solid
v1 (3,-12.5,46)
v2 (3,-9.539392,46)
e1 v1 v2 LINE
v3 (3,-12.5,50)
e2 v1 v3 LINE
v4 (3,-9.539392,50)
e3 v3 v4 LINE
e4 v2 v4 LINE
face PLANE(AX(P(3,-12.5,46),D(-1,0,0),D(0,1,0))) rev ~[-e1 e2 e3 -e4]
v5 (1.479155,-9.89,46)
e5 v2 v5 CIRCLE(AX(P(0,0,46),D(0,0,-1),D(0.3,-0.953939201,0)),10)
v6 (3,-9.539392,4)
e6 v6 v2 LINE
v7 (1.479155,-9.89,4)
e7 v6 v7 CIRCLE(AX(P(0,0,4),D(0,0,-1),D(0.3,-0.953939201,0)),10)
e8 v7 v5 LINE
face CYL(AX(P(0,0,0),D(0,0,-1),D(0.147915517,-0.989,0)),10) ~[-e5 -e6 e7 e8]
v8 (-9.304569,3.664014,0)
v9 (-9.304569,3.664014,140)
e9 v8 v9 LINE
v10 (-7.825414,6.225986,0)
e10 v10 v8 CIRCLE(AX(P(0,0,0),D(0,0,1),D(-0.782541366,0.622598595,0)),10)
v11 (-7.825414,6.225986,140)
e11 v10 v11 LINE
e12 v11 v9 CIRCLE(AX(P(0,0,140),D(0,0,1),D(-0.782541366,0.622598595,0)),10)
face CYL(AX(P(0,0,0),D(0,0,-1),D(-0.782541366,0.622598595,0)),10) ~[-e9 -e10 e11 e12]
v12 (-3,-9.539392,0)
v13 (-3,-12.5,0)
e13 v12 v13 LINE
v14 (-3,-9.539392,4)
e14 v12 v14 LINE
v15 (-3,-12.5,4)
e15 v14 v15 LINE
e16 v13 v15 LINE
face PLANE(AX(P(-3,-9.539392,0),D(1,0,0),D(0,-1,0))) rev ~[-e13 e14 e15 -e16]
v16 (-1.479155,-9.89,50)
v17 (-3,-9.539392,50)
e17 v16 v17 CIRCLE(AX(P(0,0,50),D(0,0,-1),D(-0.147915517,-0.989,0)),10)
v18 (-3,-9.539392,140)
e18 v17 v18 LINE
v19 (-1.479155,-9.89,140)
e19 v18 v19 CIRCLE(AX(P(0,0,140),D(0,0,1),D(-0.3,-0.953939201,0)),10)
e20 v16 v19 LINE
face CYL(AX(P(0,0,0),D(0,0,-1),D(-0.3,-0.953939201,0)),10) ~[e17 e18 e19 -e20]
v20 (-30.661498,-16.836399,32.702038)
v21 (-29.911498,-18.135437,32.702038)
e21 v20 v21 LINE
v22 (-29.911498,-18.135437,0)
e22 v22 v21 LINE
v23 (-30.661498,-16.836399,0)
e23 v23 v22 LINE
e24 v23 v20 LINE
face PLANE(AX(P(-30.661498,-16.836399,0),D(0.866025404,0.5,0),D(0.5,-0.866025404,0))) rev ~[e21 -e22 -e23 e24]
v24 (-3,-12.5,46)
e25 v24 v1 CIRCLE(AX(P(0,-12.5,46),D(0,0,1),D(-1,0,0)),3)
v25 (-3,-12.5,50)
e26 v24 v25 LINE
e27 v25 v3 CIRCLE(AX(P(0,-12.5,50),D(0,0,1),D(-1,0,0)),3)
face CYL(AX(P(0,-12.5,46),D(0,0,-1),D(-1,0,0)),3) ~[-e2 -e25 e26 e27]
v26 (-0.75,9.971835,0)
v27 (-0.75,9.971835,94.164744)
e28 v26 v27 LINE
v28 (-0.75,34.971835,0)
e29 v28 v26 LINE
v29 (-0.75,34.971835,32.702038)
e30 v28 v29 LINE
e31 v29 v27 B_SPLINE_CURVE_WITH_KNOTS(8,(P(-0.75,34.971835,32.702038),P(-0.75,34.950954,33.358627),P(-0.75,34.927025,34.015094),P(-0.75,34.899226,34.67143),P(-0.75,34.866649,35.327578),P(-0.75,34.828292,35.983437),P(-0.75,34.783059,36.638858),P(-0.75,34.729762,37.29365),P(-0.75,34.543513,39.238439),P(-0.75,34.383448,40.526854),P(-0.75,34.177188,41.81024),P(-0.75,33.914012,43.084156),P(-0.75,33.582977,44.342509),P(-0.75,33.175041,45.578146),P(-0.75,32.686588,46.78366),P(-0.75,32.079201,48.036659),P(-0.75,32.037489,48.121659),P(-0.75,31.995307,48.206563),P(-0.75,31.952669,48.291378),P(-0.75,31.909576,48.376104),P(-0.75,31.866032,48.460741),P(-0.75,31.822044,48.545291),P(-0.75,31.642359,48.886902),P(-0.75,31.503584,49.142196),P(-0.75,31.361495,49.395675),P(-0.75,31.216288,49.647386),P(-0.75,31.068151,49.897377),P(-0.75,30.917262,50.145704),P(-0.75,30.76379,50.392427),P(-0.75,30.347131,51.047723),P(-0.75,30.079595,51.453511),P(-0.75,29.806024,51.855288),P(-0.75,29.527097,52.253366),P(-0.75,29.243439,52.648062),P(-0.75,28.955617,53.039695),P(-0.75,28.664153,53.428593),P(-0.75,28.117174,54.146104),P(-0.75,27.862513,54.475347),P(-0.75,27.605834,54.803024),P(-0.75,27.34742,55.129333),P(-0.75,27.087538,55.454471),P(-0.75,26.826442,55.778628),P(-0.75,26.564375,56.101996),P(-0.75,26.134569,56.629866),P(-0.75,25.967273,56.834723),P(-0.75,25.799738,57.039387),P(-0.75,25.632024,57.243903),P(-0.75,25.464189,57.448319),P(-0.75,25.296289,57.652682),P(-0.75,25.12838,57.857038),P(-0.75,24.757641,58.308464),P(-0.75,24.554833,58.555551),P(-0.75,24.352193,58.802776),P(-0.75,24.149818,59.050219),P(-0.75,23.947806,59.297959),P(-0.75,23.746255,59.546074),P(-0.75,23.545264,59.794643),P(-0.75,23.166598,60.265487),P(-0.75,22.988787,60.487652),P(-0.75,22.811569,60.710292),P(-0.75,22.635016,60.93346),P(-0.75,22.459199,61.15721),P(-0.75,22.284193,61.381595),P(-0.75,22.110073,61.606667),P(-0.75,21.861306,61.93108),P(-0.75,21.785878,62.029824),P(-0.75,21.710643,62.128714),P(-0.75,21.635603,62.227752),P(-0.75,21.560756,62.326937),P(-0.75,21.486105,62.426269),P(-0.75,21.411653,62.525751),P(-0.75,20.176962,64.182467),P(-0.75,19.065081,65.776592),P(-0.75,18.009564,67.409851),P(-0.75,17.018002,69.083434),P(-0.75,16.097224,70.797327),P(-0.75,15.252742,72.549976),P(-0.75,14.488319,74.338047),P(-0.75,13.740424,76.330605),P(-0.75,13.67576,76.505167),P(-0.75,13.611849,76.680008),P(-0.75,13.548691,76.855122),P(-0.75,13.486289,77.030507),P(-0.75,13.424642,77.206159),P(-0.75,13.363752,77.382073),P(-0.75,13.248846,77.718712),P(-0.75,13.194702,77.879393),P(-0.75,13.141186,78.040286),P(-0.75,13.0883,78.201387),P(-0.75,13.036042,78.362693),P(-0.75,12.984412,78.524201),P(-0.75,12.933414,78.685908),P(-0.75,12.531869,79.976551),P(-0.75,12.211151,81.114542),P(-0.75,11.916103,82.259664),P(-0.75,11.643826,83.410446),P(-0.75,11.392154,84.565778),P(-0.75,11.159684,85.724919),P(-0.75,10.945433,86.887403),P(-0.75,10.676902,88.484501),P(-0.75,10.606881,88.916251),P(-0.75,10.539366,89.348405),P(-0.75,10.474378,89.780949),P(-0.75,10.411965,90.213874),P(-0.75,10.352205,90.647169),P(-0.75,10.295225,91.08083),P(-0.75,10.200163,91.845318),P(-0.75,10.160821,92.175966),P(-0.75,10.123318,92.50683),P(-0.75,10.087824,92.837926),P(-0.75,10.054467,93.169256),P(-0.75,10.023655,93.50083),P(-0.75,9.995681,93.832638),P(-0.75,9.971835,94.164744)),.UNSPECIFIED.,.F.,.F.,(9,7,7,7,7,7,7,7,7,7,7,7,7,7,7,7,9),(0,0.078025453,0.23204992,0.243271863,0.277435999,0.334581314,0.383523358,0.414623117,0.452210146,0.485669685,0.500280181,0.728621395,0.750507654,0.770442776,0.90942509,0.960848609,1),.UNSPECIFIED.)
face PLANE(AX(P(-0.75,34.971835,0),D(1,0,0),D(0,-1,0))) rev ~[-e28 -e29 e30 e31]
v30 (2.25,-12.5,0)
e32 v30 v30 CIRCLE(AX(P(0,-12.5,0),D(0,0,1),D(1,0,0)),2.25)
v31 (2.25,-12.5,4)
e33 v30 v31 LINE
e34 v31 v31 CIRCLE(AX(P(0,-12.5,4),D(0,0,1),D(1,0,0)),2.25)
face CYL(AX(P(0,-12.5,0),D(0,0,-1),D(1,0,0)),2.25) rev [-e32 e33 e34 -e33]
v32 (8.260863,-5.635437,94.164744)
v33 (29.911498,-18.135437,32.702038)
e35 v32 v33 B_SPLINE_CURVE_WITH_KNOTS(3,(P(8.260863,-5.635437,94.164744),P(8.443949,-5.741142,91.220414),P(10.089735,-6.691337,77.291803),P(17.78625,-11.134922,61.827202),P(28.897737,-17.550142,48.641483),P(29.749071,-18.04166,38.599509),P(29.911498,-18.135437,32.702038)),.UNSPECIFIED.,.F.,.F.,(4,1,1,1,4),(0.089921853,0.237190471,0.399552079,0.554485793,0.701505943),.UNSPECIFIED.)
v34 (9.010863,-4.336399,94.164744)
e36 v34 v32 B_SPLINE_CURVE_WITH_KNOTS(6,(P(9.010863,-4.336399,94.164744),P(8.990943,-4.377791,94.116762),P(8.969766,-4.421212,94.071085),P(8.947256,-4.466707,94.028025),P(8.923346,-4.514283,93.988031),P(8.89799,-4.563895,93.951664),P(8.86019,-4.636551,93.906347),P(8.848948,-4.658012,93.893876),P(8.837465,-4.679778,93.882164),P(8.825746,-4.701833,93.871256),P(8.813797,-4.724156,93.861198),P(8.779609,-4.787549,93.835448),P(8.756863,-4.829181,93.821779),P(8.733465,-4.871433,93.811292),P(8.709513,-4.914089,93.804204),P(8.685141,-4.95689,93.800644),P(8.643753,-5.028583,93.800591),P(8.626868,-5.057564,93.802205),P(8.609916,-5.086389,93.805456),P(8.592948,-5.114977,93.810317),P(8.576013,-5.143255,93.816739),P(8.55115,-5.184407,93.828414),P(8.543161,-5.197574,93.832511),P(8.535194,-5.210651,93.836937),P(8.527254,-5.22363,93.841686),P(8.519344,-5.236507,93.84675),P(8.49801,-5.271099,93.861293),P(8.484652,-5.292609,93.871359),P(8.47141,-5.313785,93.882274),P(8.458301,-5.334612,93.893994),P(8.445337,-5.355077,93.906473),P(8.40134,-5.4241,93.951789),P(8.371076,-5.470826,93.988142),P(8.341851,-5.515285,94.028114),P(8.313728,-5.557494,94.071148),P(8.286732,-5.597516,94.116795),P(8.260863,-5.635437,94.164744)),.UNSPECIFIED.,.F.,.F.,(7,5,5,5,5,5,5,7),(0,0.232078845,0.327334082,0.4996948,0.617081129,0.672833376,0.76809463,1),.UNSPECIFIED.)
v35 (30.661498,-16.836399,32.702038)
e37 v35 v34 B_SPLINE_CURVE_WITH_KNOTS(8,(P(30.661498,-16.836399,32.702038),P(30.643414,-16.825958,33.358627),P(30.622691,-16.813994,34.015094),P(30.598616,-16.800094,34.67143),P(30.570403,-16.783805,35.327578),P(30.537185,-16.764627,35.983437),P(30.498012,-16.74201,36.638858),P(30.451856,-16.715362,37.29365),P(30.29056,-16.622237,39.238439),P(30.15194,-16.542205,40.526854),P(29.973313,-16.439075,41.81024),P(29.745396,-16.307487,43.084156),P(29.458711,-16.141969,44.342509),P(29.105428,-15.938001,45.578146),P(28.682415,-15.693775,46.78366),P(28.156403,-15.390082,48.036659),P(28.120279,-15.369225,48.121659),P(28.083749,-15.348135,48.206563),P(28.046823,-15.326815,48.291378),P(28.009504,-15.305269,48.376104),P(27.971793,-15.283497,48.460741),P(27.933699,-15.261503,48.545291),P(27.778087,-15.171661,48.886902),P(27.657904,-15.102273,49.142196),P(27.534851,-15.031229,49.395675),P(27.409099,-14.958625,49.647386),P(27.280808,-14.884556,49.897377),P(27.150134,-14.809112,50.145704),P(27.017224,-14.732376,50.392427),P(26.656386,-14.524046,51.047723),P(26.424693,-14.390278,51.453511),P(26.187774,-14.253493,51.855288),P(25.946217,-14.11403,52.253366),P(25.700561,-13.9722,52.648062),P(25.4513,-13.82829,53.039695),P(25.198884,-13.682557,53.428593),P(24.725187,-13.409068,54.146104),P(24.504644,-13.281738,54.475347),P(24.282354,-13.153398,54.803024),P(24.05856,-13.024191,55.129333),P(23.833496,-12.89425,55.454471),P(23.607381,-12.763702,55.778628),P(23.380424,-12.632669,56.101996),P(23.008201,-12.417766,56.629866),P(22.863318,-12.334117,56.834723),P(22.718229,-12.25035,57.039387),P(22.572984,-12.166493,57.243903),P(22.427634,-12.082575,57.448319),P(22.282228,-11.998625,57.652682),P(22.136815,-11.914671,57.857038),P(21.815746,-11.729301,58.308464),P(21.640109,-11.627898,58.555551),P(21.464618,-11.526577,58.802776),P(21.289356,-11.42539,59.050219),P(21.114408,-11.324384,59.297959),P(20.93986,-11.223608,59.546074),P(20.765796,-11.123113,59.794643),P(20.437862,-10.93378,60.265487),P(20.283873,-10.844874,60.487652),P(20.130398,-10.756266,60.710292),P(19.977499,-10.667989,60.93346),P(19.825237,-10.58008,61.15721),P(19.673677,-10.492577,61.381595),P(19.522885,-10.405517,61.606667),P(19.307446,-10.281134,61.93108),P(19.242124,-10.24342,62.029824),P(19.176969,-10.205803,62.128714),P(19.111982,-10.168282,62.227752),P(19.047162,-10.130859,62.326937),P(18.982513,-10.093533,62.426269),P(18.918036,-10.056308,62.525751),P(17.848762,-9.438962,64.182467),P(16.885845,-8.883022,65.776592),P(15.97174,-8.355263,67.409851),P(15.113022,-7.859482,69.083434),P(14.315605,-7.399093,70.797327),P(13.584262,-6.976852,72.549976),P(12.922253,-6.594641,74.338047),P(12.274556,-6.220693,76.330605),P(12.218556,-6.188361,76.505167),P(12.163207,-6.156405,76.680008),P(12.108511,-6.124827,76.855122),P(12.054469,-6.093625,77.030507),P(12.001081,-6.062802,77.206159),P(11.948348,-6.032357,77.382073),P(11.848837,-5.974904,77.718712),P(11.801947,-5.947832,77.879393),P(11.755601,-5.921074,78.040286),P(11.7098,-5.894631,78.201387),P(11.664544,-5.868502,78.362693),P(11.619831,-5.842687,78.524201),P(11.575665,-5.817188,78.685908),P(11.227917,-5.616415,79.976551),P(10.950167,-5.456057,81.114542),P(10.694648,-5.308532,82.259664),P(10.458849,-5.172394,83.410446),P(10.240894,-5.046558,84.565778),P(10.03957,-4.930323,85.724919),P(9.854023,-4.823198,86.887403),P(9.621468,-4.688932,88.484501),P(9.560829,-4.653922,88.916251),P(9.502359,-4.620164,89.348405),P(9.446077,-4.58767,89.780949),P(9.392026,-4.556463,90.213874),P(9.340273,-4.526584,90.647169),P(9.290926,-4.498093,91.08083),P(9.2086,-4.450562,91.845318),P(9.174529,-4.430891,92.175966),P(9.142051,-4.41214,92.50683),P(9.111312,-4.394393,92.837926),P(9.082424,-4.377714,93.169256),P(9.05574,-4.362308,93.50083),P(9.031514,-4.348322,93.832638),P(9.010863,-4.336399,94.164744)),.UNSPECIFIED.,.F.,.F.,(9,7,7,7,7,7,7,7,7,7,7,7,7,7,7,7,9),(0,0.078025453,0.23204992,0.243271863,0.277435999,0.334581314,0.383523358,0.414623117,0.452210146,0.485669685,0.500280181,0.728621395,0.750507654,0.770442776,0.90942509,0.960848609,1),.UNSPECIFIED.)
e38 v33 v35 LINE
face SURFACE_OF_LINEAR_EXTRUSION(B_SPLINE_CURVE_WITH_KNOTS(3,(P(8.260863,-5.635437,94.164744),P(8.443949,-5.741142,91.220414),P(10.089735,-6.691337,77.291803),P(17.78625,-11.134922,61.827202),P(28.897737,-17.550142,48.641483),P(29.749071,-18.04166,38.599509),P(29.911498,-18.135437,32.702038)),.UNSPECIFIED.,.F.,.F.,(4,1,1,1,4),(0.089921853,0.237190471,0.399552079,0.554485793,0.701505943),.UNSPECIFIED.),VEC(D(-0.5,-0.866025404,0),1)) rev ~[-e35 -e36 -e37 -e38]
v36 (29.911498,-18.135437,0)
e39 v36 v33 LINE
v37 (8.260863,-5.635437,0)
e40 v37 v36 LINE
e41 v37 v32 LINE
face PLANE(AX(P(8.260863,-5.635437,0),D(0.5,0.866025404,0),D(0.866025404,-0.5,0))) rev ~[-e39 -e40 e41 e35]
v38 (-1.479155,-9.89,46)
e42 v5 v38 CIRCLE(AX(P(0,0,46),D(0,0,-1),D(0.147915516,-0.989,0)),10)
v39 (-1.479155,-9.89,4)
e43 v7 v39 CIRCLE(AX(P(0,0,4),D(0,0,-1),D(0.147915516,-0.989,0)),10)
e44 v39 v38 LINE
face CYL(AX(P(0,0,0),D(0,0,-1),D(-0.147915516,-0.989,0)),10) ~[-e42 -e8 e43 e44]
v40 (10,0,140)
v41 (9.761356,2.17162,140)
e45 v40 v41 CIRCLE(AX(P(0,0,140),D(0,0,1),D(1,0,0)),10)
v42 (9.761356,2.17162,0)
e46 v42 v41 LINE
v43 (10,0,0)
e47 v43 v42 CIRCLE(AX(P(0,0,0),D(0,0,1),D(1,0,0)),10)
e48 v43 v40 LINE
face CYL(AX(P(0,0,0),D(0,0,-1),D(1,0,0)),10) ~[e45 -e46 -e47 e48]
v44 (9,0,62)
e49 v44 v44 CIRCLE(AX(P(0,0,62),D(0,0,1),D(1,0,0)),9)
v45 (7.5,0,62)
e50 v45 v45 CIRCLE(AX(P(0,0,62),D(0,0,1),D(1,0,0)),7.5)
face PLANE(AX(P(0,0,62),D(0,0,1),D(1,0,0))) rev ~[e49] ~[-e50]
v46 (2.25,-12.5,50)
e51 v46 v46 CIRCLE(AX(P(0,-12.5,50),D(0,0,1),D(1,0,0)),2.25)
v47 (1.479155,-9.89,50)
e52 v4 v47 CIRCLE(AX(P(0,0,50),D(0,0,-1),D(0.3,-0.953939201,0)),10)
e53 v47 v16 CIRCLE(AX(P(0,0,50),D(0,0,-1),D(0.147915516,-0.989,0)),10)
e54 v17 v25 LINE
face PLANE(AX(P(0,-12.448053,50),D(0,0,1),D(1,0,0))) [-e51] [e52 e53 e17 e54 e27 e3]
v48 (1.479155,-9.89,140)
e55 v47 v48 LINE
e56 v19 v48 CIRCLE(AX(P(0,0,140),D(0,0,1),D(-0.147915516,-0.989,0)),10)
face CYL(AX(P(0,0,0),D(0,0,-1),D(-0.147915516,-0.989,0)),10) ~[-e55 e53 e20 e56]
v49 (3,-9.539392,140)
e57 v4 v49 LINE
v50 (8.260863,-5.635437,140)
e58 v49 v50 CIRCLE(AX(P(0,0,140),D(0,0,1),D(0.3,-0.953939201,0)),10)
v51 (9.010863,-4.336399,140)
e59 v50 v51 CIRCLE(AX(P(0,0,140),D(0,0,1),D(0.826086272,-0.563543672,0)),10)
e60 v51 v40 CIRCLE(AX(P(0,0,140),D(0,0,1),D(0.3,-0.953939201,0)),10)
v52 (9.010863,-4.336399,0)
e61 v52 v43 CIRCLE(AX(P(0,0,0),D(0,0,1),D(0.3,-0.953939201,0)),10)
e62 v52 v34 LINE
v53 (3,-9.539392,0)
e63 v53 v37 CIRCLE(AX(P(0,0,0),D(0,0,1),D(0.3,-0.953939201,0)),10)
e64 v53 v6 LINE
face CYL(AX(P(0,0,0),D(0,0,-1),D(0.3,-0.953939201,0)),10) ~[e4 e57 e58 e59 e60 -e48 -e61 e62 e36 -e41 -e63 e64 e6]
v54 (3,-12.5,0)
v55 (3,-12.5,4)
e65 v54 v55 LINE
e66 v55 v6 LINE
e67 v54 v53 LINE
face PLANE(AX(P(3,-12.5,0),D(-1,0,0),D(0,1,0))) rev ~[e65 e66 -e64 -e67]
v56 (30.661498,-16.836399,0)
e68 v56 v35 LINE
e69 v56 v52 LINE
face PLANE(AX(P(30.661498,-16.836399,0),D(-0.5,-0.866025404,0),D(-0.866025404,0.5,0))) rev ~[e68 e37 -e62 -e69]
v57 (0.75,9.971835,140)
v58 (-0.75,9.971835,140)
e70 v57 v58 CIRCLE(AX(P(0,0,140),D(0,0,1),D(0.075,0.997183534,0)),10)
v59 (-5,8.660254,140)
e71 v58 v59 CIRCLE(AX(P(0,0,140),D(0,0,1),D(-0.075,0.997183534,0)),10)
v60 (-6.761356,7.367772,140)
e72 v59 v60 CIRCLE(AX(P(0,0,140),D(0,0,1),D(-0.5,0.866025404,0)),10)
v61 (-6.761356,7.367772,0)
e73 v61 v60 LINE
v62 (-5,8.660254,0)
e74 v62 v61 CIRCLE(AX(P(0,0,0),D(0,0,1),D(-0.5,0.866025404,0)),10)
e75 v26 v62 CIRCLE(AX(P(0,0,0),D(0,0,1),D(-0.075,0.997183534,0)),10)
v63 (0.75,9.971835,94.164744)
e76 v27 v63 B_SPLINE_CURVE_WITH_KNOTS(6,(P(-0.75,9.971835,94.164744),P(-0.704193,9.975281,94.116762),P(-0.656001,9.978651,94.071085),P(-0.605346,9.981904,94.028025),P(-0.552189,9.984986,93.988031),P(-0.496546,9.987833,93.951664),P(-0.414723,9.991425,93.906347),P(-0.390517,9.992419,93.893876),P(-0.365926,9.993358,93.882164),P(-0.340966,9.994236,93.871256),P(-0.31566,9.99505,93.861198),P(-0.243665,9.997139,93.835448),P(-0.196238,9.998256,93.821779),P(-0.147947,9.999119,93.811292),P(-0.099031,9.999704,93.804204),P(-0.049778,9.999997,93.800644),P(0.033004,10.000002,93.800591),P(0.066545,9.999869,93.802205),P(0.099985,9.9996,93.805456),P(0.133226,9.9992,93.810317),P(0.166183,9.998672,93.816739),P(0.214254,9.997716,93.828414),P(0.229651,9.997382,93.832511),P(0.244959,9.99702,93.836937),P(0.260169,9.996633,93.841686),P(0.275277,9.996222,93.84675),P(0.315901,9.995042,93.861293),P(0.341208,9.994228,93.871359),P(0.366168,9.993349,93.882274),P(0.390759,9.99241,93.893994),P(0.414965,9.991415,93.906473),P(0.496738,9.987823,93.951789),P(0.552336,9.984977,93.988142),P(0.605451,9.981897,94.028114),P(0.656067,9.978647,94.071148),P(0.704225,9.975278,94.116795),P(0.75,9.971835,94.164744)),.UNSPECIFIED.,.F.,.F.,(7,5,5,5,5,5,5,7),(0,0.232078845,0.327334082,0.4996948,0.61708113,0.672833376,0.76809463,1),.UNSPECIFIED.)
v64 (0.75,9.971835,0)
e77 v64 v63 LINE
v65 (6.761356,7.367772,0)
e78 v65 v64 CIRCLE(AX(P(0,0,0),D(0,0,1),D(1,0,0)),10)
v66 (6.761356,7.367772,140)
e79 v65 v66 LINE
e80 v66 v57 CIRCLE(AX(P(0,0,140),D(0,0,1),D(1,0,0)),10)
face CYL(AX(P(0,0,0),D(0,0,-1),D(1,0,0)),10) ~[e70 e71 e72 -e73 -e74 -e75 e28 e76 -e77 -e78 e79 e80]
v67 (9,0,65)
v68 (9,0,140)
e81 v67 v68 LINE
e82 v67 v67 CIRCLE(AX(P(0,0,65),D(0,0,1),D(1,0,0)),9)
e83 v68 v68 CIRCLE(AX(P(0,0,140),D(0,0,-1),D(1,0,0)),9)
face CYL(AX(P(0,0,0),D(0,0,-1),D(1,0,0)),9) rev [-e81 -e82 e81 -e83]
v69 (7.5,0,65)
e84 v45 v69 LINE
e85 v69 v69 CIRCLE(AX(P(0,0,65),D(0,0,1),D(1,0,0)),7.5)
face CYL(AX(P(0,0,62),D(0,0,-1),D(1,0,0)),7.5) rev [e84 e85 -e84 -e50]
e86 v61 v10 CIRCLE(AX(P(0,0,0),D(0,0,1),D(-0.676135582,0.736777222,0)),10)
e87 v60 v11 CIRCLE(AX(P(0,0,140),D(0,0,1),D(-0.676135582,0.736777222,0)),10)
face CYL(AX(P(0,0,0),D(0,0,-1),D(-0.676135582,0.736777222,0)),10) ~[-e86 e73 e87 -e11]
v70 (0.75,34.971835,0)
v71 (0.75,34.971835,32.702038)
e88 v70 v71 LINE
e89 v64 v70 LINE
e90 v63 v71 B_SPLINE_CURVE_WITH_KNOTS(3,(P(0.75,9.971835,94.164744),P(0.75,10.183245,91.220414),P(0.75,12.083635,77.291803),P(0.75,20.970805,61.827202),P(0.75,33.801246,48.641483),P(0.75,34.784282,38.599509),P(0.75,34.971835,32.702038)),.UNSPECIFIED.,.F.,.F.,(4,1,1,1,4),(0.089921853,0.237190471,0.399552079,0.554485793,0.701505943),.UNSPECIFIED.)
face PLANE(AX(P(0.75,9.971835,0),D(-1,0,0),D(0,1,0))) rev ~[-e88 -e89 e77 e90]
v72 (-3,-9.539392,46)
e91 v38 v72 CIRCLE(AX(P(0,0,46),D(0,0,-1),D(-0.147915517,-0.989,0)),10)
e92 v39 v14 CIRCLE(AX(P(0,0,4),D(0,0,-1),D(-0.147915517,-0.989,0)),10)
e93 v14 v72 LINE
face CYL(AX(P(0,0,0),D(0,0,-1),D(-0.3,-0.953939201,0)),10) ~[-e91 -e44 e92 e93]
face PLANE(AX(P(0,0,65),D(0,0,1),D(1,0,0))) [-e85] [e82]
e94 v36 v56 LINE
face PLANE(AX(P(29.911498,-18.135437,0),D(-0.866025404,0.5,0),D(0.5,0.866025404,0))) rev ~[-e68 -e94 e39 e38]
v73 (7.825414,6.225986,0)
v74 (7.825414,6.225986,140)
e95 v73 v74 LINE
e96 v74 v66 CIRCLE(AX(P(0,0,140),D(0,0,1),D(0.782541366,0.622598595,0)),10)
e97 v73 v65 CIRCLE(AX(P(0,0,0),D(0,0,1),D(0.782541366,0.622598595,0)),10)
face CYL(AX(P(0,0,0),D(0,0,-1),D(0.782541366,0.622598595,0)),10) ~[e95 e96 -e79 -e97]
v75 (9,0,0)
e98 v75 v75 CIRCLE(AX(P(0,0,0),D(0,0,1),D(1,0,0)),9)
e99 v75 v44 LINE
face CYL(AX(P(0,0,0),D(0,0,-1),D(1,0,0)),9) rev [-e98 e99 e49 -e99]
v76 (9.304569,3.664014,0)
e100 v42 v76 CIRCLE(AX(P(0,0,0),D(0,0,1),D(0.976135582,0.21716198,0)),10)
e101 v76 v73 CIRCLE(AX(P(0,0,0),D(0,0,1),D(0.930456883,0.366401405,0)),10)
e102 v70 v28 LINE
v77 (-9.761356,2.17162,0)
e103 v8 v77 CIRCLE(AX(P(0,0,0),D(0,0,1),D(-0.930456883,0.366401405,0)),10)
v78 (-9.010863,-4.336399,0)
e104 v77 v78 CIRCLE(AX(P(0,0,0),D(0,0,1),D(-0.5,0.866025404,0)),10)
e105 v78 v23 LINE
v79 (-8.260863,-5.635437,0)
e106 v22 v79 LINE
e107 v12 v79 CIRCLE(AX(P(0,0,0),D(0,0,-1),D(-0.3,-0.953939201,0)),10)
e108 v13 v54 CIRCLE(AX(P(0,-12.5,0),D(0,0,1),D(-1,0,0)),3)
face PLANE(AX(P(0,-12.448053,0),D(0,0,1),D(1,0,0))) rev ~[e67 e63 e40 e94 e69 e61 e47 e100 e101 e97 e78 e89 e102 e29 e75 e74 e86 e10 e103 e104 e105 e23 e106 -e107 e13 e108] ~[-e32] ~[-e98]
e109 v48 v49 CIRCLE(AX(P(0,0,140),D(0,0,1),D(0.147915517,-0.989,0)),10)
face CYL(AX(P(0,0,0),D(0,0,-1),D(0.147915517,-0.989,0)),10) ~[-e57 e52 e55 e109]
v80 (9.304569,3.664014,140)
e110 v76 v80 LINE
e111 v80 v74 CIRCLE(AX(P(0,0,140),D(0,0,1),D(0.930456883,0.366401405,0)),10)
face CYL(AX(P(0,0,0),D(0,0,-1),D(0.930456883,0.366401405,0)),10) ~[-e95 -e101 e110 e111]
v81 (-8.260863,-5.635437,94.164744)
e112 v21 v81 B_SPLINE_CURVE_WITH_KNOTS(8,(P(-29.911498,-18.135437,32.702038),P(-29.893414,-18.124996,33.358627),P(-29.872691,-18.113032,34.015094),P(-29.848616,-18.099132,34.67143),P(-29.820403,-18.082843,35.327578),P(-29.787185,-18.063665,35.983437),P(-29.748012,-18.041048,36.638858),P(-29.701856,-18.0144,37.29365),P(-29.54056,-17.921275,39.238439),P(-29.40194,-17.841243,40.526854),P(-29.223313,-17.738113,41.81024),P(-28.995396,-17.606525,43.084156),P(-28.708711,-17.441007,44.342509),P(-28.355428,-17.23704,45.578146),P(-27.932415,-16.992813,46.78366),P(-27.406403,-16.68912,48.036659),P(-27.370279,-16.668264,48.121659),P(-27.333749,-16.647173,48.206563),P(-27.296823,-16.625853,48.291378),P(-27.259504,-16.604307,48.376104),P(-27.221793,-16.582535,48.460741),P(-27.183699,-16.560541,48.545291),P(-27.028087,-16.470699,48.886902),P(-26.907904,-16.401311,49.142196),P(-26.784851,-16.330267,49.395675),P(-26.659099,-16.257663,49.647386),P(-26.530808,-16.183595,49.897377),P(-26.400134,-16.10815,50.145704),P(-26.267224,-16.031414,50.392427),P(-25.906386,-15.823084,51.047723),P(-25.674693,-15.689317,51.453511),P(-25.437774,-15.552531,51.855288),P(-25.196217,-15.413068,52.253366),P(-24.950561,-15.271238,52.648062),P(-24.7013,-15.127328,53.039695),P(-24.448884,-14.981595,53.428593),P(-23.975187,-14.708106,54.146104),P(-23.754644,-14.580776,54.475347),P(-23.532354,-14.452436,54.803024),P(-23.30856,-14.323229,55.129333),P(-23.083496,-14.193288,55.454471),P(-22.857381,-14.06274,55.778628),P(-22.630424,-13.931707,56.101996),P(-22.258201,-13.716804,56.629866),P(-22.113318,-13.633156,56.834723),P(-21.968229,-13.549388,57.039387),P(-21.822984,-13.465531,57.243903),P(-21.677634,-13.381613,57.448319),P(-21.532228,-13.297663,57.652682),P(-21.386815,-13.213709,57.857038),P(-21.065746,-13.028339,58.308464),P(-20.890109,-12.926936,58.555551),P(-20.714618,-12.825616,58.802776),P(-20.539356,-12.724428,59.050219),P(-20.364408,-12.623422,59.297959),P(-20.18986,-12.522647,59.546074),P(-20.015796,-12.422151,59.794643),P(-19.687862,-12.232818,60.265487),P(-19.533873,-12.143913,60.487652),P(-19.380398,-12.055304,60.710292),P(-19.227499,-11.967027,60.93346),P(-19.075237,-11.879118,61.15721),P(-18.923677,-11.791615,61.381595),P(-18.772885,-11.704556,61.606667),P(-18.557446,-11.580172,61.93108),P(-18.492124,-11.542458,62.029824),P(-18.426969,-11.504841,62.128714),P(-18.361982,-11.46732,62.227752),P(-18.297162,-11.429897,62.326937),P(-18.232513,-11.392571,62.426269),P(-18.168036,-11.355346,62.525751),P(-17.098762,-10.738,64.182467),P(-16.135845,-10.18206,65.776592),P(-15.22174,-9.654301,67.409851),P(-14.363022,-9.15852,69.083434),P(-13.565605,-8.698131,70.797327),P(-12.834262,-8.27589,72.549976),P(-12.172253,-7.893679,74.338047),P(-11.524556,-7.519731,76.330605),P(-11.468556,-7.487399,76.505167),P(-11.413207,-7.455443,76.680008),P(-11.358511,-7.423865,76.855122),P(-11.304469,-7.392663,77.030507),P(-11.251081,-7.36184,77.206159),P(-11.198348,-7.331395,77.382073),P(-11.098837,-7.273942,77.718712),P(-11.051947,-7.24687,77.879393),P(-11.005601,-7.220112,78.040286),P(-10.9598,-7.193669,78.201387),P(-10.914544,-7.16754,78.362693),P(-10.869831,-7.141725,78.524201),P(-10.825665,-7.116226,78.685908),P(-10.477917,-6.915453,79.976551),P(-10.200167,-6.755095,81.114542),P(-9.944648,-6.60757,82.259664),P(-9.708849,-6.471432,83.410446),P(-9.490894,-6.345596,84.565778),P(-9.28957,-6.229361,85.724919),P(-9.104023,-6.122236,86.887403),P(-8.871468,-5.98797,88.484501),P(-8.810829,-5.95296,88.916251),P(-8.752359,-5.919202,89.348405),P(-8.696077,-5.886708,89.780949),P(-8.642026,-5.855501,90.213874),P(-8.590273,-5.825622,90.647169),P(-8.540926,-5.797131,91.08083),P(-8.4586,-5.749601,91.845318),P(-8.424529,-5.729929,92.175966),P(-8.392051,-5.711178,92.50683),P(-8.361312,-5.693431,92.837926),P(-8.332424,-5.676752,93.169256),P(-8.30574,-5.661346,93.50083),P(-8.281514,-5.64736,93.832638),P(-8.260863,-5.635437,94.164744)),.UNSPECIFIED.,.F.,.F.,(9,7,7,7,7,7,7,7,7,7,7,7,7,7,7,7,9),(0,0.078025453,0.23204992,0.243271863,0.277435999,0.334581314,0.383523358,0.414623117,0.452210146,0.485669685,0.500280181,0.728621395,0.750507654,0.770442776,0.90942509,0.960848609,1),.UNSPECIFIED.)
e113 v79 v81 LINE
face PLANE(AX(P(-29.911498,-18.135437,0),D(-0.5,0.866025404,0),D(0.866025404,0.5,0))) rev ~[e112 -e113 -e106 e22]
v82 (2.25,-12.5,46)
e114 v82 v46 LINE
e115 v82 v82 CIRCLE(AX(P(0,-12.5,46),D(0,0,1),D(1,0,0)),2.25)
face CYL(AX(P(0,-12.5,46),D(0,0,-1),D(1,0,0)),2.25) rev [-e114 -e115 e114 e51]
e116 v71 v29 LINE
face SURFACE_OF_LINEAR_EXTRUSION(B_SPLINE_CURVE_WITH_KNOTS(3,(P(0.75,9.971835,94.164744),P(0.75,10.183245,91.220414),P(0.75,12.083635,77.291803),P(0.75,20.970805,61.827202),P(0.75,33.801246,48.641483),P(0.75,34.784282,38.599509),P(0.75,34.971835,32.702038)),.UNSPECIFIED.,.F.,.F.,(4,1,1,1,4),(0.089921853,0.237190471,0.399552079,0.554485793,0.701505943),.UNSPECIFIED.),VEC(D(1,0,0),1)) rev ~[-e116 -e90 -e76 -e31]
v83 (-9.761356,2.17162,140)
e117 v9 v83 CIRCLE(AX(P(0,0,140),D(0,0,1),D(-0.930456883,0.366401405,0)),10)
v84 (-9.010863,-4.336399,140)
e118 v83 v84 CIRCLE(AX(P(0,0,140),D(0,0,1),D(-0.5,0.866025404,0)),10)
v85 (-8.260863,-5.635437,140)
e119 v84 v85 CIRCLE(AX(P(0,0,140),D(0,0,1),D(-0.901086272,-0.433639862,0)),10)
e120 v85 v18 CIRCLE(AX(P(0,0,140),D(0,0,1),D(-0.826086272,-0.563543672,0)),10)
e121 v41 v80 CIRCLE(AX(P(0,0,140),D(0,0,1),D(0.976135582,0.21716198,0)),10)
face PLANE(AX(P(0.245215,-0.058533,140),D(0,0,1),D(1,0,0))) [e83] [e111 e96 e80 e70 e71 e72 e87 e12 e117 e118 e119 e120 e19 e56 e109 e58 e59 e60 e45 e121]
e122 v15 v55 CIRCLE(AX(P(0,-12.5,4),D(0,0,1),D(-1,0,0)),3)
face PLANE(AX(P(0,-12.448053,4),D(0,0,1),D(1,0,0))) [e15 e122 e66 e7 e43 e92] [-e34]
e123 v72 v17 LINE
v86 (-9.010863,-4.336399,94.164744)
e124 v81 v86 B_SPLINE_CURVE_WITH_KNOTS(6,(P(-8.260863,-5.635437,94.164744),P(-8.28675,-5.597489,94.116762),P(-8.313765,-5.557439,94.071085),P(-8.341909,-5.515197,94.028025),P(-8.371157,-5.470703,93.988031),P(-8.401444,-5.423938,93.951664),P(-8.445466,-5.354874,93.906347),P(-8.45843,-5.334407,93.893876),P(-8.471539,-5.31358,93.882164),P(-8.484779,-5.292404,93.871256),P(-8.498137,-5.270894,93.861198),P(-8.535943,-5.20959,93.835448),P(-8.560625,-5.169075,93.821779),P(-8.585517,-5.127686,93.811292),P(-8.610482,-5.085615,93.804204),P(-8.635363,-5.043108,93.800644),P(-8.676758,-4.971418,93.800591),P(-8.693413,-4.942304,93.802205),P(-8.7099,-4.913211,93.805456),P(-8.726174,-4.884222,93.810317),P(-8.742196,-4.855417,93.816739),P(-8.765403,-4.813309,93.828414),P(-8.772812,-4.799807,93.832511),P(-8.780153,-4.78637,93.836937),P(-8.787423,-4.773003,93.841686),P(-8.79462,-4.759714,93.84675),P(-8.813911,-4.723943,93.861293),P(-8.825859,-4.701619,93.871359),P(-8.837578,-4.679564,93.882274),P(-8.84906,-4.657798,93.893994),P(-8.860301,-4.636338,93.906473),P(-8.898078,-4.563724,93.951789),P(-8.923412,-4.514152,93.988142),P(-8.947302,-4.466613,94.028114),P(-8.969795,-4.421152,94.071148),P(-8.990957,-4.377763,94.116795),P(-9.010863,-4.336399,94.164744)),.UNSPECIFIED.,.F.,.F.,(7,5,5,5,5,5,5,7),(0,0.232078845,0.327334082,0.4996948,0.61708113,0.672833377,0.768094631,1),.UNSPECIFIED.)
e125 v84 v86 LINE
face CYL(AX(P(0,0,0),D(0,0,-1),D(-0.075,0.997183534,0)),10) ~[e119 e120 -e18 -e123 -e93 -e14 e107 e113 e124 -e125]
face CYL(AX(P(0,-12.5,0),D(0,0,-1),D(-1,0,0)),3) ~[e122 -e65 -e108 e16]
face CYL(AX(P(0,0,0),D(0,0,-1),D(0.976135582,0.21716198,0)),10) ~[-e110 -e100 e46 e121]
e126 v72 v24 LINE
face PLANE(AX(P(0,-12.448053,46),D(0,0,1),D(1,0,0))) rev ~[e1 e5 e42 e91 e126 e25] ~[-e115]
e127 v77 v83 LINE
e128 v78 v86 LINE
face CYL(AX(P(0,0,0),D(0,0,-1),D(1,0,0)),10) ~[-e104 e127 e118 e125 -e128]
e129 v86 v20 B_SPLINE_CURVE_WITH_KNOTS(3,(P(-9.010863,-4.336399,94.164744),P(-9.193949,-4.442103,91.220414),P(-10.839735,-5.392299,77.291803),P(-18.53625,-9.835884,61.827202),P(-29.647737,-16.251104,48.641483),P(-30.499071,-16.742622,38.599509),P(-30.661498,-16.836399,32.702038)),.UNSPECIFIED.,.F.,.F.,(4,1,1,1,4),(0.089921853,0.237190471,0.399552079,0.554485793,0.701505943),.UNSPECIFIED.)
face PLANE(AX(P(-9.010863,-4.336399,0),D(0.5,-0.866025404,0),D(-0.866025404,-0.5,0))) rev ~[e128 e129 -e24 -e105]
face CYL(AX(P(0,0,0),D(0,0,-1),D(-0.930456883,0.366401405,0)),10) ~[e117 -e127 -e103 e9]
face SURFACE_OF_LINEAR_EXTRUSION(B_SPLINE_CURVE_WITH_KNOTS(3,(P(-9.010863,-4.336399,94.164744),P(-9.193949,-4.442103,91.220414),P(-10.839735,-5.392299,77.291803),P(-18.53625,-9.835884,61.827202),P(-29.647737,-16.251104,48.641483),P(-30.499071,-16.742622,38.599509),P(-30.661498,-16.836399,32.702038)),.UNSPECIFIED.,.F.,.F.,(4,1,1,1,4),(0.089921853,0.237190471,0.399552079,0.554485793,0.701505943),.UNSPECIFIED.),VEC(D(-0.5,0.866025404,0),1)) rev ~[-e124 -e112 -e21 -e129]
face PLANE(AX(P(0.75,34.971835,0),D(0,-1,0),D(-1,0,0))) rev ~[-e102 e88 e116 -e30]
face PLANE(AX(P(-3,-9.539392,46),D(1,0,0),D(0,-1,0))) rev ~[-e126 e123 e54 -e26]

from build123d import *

# Parameters (mm, degrees)
F0_R     = 9
F1_DEPTH = 140
F2_DEPTH = 100
F4_DEPTH = 10.751
F5_COUNT = 3
F0_R_2   = 2.25
F6_DEPTH = 4
F7_START = 46
F7_DEPTH = 4
F8_START = 62
F0_R_3   = 7.5
F8_DEPTH = 3


# Not quite as in the source:
# - a feature names something its author has since deleted; it is built from what else it names


with BuildPart() as f1:
    # F0 (on Top) → F1 (new body)
    with BuildSketch(Plane.XY):
        with BuildLine():
            ThreePointArc((-3, -9.5393920142), (-2.2464281062, -9.744411771), (-1.4791551643, -9.89))
            ThreePointArc((-1.4791551643, -9.89), (0, -10), (1.4791551643, -9.89))
            ThreePointArc((1.4791551643, -9.89), (2.2464281062, -9.744411771), (3, -9.5393920142))
            ThreePointArc((3, -9.5393920142), (8.0622577483, -5.9160797831), (10, 0))
            ThreePointArc((10, 0), (7.3314391493, 6.8007352544), (0.75, 9.9718353376))
            ThreePointArc((0.75, 9.9718353376), (0, 10), (-0.75, 9.9718353376))
            ThreePointArc((-0.75, 9.9718353376), (-9.9341644436, 1.1455901566), (-3, -9.5393920142))
        make_face()
        Circle(F0_R, mode=Mode.SUBTRACT)
    extrude(amount=F1_DEPTH)

    # F0 (on Top) → F2 (join)
    with BuildSketch(Plane.XY):
        with BuildLine():
            Line((-0.75, 34.9718353376), (-0.75, 9.9718353376))
            ThreePointArc((-0.75, 9.9718353376), (0, 10), (0.75, 9.9718353376))
            Line((0.75, 9.9718353376), (0.75, 34.9718353376))
            Line((0.75, 34.9718353376), (-0.75, 34.9718353376))
        make_face()
    extrude(amount=F2_DEPTH)

    # F3 (on face) → F4 (cut, through all)
    with BuildSketch(Plane.YZ.offset(0.75)):
        with BuildLine():
            Line((34.9718353376, 100), (9.9718353376, 100))
            Line((9.9718353376, 100), (9.9718353376, 94.1647440576))
            add(Edge.make_bspline(
                [(9.9718353376, 94.1647440576), (10.1832449594, 91.2204140215), (12.0836351221, 77.2918027042), (20.9708053433, 61.8272021249), (33.801245613, 48.6414831262), (34.7842815391, 38.599508776), (34.9718353376, 32.702038365)],
                knots=[0.0899218527, 0.0899218527, 0.0899218527, 0.0899218527, 0.2371904705, 0.3995520788, 0.5544857931, 0.7015059428, 0.7015059428, 0.7015059428, 0.7015059428], degree=3))
            Line((34.9718353376, 32.702038365), (34.9718353376, 100))
        make_face()
    extrude(amount=-F4_DEPTH, mode=Mode.SUBTRACT)


with BuildPart() as f5_1:
    # F5: instance of F1
    add(f1.part.rotate(Axis((0, 0, 0), (0, 0, 1)), 1 * 360 / F5_COUNT))


with BuildPart() as f5_2:
    # F5: instance of F1
    add(f1.part.rotate(Axis((0, 0, 0), (0, 0, 1)), 2 * 360 / F5_COUNT))


with BuildPart() as f1_1:
    add(f1.part)

    add(f5_1.part)  # F6 merges F5_1

    add(f5_2.part)  # F6 merges F5_2
    # F0 (on Top) → F6 (join)
    with BuildSketch(Plane.XY):
        with BuildLine():
            ThreePointArc((1.4791551643, -9.89), (0, -10), (-1.4791551643, -9.89))
            ThreePointArc((-1.4791551643, -9.89), (-2.592051841, -10.9896135416), (-3, -12.5))
            ThreePointArc((-3, -12.5), (0, -15.5), (3, -12.5))
            ThreePointArc((3, -12.5), (2.592051841, -10.9896135416), (1.4791551643, -9.89))
        make_face()
        with Locations((0, -12.5)):
            Circle(F0_R_2, mode=Mode.SUBTRACT)
        with BuildLine():
            ThreePointArc((-3, -12.5), (-2.592051841, -10.9896135416), (-1.4791551643, -9.89))
            ThreePointArc((-1.4791551643, -9.89), (-2.2464281062, -9.744411771), (-3, -9.5393920142))
            Line((-3, -9.5393920142), (-3, -12.5))
        make_face()
        with BuildLine():
            ThreePointArc((3, -9.5393920142), (2.2464281062, -9.744411771), (1.4791551643, -9.89))
            ThreePointArc((1.4791551643, -9.89), (2.592051841, -10.9896135416), (3, -12.5))
            Line((3, -12.5), (3, -9.5393920142))
        make_face()
    extrude(amount=F6_DEPTH)

    # F0 (on Top) → F7 (join)
    with BuildSketch(Plane.XY.offset(F7_START)):
        with BuildLine():
            ThreePointArc((1.4791551643, -9.89), (0, -10), (-1.4791551643, -9.89))
            ThreePointArc((-1.4791551643, -9.89), (-2.592051841, -10.9896135416), (-3, -12.5))
            ThreePointArc((-3, -12.5), (0, -15.5), (3, -12.5))
            ThreePointArc((3, -12.5), (2.592051841, -10.9896135416), (1.4791551643, -9.89))
        make_face()
        with Locations((0, -12.5)):
            Circle(F0_R_2, mode=Mode.SUBTRACT)
        with BuildLine():
            ThreePointArc((-3, -12.5), (-2.592051841, -10.9896135416), (-1.4791551643, -9.89))
            ThreePointArc((-1.4791551643, -9.89), (-2.2464281062, -9.744411771), (-3, -9.5393920142))
            Line((-3, -9.5393920142), (-3, -12.5))
        make_face()
        with BuildLine():
            ThreePointArc((3, -9.5393920142), (2.2464281062, -9.744411771), (1.4791551643, -9.89))
            ThreePointArc((1.4791551643, -9.89), (2.592051841, -10.9896135416), (3, -12.5))
            Line((3, -12.5), (3, -9.5393920142))
        make_face()
    extrude(amount=F7_DEPTH)

    # F0 (on Top) → F8 (join)
    with BuildSketch(Plane.XY.offset(F8_START)):
        Circle(F0_R)
        Circle(F0_R_3, mode=Mode.SUBTRACT)
    extrude(amount=F8_DEPTH)


solid = f1_1.part
